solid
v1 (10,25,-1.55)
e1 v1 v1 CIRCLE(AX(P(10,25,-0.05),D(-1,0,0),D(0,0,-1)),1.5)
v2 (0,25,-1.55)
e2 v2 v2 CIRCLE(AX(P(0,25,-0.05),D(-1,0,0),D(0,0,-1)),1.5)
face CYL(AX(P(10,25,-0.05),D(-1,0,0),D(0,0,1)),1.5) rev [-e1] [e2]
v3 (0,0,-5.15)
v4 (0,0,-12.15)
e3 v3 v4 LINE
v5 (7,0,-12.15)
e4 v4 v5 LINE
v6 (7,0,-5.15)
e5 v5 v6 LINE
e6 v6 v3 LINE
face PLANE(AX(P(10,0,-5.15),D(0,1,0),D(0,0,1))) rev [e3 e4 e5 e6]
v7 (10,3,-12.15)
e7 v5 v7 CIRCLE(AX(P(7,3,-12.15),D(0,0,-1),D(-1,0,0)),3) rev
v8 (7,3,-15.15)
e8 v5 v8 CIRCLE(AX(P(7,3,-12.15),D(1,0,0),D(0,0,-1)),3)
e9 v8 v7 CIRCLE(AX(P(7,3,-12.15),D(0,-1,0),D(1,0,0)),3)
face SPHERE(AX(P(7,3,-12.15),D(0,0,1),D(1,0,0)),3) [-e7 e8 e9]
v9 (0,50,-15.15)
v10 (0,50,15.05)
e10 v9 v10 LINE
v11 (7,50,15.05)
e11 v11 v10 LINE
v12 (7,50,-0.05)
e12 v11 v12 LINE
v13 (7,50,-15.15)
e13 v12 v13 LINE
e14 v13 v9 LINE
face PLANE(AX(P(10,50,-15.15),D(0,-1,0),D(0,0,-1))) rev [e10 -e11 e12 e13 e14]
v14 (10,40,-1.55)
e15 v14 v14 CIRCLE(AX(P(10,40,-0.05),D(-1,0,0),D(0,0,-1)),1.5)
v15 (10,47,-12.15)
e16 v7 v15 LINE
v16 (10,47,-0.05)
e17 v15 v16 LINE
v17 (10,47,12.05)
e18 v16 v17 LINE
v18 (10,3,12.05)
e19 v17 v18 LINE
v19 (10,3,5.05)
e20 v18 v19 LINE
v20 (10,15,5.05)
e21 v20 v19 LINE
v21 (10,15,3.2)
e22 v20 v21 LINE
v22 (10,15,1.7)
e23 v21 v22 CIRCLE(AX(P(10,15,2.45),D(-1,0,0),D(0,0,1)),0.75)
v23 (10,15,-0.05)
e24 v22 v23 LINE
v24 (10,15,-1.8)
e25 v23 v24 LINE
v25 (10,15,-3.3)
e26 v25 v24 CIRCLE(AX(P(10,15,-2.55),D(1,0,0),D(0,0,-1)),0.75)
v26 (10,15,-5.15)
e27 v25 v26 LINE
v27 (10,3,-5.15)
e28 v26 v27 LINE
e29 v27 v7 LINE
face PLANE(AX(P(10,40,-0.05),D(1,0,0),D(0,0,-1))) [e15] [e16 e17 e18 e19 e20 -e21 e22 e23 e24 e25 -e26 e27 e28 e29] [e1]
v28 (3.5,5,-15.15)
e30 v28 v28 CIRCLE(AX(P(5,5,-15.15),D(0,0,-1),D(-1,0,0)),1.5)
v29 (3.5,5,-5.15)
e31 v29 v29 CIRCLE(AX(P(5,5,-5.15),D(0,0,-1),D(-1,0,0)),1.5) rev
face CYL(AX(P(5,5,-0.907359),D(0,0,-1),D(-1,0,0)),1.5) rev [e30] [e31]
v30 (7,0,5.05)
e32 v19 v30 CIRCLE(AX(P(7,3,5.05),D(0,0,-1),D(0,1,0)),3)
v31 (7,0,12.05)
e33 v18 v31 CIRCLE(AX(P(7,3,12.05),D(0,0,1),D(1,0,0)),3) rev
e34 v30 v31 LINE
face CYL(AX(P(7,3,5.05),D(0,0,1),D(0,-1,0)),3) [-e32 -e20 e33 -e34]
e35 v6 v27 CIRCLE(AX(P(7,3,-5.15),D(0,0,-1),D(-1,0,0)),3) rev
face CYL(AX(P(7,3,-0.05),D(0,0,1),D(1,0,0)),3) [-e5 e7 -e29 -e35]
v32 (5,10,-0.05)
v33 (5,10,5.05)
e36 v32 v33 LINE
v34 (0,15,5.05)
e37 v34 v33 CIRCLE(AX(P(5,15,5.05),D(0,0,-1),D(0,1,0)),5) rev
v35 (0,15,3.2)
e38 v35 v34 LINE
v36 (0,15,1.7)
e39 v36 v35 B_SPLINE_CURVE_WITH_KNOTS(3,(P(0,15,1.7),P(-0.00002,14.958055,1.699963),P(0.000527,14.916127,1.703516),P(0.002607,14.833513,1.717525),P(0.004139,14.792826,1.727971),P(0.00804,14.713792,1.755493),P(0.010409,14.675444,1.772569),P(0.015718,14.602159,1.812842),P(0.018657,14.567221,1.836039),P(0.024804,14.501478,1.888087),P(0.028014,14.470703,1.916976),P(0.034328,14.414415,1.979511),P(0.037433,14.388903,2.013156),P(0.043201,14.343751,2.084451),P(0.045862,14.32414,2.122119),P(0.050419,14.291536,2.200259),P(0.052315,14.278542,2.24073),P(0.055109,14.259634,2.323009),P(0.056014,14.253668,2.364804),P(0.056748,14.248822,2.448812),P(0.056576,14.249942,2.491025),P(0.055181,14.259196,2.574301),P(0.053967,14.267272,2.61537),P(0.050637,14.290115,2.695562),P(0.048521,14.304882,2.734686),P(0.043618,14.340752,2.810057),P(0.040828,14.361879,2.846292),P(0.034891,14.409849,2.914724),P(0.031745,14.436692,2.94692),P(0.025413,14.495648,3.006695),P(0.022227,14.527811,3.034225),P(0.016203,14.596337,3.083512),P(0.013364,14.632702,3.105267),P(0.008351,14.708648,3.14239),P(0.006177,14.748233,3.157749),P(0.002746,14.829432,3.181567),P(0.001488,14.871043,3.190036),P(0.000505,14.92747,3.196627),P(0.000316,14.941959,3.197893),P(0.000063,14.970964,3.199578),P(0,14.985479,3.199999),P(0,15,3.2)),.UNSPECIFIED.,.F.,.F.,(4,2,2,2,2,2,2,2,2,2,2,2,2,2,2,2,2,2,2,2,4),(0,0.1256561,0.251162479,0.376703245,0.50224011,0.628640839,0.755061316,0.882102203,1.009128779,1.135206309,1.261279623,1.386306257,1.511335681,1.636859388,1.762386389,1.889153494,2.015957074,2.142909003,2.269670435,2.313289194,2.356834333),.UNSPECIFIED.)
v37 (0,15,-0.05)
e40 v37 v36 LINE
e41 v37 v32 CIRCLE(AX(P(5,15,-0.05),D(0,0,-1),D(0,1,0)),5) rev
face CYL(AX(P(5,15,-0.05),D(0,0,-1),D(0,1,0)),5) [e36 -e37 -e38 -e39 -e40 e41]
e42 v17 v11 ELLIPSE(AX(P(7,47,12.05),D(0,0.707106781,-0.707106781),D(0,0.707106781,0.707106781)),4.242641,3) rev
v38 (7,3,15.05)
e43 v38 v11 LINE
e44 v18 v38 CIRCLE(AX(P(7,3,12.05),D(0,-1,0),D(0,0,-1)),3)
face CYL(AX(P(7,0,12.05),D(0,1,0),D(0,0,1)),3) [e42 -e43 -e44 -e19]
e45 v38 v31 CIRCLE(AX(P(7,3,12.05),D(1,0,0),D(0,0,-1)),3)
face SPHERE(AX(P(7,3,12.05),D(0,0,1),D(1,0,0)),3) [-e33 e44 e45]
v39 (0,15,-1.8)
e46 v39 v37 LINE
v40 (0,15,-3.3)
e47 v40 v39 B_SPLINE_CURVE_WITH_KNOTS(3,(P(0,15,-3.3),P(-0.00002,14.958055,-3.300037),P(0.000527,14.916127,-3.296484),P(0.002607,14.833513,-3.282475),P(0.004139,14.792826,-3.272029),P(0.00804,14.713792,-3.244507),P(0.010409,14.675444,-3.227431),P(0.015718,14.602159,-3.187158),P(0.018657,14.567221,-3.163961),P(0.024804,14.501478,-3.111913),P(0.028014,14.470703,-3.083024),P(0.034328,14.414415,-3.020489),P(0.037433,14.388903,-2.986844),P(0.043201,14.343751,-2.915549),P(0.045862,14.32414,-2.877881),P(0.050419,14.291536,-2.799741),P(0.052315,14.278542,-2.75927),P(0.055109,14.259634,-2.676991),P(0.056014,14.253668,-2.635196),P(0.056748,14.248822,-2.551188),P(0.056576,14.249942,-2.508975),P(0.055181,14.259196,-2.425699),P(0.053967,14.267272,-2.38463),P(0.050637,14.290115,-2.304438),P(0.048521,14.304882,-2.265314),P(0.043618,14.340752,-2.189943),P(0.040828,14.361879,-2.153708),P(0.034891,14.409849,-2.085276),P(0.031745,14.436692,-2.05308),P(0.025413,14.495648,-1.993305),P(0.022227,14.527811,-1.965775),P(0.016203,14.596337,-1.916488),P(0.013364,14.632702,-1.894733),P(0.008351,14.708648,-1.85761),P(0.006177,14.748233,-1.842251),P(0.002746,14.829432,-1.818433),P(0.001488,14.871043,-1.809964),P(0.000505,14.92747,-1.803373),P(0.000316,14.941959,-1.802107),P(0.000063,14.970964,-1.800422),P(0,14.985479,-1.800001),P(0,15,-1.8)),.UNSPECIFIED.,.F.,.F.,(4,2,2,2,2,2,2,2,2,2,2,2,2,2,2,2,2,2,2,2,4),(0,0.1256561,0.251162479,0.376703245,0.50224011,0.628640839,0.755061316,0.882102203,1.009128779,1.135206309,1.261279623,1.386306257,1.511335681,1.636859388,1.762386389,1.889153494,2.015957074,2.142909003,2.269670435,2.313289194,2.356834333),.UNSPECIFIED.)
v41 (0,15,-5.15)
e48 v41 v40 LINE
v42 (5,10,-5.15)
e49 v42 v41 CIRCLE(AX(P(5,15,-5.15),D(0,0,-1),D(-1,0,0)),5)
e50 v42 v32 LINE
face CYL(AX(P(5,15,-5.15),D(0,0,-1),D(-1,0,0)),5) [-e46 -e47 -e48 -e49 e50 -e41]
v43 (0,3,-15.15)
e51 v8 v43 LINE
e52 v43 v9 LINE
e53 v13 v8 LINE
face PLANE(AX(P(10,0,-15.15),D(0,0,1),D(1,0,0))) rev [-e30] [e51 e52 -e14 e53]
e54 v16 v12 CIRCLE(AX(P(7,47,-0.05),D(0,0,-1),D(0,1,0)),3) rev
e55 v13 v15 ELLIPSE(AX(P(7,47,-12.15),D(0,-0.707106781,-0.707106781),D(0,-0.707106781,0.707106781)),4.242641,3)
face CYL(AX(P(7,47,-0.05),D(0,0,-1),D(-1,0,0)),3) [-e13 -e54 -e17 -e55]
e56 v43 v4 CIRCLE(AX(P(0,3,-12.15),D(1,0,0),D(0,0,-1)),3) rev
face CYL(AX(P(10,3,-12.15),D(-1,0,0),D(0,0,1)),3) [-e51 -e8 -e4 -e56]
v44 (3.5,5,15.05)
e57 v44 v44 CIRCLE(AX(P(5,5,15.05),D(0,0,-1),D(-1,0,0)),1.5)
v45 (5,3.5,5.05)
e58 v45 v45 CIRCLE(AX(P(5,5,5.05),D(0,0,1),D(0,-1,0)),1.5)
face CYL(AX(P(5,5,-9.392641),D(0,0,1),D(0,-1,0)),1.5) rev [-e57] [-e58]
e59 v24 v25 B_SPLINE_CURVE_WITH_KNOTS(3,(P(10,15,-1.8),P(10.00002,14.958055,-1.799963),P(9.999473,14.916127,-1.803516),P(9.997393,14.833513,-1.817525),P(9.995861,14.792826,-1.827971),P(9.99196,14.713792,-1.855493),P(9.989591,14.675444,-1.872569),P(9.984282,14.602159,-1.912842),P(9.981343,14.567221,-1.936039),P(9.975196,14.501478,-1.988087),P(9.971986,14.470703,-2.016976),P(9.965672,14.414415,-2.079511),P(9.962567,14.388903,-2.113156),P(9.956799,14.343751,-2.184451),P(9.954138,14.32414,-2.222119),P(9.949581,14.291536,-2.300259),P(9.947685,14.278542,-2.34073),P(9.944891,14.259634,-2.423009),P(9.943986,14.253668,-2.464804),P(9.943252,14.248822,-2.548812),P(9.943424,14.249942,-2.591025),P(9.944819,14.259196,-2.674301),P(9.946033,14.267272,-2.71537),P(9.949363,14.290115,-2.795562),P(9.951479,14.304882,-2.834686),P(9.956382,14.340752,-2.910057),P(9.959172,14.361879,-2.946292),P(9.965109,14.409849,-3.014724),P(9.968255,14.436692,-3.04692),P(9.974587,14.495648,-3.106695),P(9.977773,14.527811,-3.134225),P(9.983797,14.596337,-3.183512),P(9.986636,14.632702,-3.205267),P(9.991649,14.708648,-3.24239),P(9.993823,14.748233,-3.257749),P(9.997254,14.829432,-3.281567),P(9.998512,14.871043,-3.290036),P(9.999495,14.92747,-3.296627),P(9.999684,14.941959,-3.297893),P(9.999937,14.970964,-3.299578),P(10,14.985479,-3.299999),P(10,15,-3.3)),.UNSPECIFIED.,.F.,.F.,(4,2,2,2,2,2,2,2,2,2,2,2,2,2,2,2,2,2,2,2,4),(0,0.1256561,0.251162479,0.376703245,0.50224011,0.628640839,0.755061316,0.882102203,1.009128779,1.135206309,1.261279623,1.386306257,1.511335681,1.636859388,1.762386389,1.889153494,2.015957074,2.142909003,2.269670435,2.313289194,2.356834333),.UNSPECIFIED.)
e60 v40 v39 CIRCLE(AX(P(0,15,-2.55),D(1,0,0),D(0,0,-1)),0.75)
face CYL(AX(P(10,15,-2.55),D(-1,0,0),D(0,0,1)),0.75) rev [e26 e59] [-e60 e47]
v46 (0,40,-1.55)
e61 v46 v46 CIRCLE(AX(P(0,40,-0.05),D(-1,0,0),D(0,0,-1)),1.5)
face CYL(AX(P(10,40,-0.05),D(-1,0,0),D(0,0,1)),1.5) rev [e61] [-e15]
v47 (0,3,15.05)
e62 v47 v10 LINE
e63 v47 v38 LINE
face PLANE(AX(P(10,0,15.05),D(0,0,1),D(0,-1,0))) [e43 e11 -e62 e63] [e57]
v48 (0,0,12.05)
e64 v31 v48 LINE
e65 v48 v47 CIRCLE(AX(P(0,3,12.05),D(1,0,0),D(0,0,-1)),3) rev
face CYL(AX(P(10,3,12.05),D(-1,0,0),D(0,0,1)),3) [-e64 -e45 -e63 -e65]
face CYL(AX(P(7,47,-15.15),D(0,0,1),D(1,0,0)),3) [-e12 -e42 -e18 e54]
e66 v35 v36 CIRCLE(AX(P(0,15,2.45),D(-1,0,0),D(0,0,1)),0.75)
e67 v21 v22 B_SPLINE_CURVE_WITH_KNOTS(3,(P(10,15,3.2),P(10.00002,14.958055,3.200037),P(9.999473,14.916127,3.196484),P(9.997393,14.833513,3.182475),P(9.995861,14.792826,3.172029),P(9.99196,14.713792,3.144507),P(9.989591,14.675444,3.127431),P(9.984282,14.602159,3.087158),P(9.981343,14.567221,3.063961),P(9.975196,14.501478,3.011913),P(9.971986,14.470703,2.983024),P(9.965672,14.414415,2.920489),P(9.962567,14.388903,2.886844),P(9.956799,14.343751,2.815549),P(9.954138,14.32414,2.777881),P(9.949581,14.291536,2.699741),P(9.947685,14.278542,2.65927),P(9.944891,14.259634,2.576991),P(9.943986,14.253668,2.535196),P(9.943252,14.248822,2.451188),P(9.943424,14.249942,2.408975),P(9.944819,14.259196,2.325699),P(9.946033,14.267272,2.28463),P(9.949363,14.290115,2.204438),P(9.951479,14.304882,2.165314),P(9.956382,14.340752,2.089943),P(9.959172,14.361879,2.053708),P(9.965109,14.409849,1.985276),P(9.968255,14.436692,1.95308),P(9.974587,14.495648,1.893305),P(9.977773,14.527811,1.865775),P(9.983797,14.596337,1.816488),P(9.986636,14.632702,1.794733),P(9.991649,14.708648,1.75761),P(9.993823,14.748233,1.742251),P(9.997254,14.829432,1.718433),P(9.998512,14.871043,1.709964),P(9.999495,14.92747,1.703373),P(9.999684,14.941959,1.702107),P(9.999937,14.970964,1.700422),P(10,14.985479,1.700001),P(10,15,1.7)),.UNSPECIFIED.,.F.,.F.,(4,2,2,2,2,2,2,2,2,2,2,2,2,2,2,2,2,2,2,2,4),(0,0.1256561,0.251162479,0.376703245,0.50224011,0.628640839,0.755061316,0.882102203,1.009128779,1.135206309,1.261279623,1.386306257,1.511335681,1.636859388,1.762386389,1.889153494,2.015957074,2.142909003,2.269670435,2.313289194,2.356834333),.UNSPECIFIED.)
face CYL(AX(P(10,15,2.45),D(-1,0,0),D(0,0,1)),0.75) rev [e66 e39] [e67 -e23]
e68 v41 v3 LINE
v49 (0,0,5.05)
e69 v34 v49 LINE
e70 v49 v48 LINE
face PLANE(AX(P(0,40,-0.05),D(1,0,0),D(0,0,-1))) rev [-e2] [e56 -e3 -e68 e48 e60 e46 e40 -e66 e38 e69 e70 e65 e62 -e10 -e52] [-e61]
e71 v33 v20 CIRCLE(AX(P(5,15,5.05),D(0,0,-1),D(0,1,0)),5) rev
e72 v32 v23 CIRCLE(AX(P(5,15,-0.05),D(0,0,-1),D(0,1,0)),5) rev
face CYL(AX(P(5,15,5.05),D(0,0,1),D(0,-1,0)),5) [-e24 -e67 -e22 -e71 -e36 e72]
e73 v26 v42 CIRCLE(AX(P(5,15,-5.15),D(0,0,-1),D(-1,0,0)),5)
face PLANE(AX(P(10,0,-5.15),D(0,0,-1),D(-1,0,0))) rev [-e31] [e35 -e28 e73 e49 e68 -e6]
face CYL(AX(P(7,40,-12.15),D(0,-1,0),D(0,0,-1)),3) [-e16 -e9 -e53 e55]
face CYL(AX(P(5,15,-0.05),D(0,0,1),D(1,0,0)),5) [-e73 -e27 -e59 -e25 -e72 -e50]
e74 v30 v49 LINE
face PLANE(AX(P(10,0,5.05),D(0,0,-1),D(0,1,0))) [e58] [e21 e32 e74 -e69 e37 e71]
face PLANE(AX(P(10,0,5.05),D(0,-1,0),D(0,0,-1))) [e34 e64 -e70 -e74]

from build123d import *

# Parameters (mm, degrees)
SKETCH1_R           = 0.75
BOSS_EXTRUDE1_DEPTH = 10
FILLET1_R           = 3
FILLET2_R           = 5
SKETCH2_R           = 1.5
CUT_EXTRUDE1_DEPTH  = 10


# Read off the part's stored shape, not the designer's step: Mirror10
with BuildPart() as part:
    # Sketch1 → Boss-Extrude1 (new body)
    with BuildSketch(Plane(origin=(0, 0, 0), x_dir=(0, 0, -1), z_dir=(1, 0, 0))):
        with BuildLine():
            Line((5.15, 0), (15.15, 0))
            Line((15.15, 0), (15.15, 50))
            Line((15.15, 50), (0.05, 50))
            Line((0.05, 50), (0.05, 41.5))
            ThreePointArc((0.05, 41.5), (1.55, 40), (0.05, 38.5))
            Line((0.05, 38.5), (0.05, 26.5))
            ThreePointArc((0.05, 26.5), (1.55, 25), (0.05, 23.5))
            Line((0.05, 23.5), (0.05, 10))
            Line((0.05, 10), (5.15, 10))
            Line((5.15, 10), (5.15, 0))
        make_face()
        with Locations((2.55, 15)):
            Circle(SKETCH1_R, mode=Mode.SUBTRACT)
    extrude(amount=BOSS_EXTRUDE1_DEPTH)

    # Fillet1
    fillet1_edges = [part.edges().sort_by_distance(p)[0] for p in [
        (5, 0, -15.15),
        (10, 0, -10.15),
        (10, 25, -15.15),
        (10, 50, -7.6),
    ]]
    fillet(fillet1_edges, radius=FILLET1_R)

    # Fillet2
    # the kernel refuses this fillet: 5 mm, written as the material it takes off along each edge
    with BuildSketch(Plane(origin=(0, 10, 12.45), x_dir=(0, 1, 0), z_dir=(0, 0, -1))) as fillet2_piece_1:
        with BuildLine():
            CenterArc((FILLET2_R, FILLET2_R), FILLET2_R, 180, 90)
            Line((0, FILLET2_R), (0, 0))
            Line((0, 0), (FILLET2_R, 0))
        make_face()
    extrude(amount=17.6, mode=Mode.SUBTRACT)
    with BuildSketch(Plane(origin=(10, 10, 12.45), x_dir=(0, 1, 0), z_dir=(0, 0, -1))) as fillet2_piece_2:
        with BuildLine():
            CenterArc((FILLET2_R, -FILLET2_R), FILLET2_R, 90, 90)
            Line((0, -FILLET2_R), (0, 0))
            Line((0, 0), (FILLET2_R, 0))
        make_face()
    extrude(amount=17.6, mode=Mode.SUBTRACT)

    # Sketch2 → Cut-Extrude1 (cut)
    with BuildSketch(Plane(origin=(0, 0, -15.15), x_dir=(-1, 0, 0), z_dir=(0, 0, -1))):
        with Locations((-5, 5)):
            Circle(SKETCH2_R)
    extrude(amount=-CUT_EXTRUDE1_DEPTH, mode=Mode.SUBTRACT)

    # Mirror10: part across plane


with BuildPart() as part_1:
    add(part.part)
    add(part.part.mirror(Plane(origin=(10, 50, -0.05), x_dir=(1, 0, 0), z_dir=(0, 0, -1))))


solid = part_1.part
